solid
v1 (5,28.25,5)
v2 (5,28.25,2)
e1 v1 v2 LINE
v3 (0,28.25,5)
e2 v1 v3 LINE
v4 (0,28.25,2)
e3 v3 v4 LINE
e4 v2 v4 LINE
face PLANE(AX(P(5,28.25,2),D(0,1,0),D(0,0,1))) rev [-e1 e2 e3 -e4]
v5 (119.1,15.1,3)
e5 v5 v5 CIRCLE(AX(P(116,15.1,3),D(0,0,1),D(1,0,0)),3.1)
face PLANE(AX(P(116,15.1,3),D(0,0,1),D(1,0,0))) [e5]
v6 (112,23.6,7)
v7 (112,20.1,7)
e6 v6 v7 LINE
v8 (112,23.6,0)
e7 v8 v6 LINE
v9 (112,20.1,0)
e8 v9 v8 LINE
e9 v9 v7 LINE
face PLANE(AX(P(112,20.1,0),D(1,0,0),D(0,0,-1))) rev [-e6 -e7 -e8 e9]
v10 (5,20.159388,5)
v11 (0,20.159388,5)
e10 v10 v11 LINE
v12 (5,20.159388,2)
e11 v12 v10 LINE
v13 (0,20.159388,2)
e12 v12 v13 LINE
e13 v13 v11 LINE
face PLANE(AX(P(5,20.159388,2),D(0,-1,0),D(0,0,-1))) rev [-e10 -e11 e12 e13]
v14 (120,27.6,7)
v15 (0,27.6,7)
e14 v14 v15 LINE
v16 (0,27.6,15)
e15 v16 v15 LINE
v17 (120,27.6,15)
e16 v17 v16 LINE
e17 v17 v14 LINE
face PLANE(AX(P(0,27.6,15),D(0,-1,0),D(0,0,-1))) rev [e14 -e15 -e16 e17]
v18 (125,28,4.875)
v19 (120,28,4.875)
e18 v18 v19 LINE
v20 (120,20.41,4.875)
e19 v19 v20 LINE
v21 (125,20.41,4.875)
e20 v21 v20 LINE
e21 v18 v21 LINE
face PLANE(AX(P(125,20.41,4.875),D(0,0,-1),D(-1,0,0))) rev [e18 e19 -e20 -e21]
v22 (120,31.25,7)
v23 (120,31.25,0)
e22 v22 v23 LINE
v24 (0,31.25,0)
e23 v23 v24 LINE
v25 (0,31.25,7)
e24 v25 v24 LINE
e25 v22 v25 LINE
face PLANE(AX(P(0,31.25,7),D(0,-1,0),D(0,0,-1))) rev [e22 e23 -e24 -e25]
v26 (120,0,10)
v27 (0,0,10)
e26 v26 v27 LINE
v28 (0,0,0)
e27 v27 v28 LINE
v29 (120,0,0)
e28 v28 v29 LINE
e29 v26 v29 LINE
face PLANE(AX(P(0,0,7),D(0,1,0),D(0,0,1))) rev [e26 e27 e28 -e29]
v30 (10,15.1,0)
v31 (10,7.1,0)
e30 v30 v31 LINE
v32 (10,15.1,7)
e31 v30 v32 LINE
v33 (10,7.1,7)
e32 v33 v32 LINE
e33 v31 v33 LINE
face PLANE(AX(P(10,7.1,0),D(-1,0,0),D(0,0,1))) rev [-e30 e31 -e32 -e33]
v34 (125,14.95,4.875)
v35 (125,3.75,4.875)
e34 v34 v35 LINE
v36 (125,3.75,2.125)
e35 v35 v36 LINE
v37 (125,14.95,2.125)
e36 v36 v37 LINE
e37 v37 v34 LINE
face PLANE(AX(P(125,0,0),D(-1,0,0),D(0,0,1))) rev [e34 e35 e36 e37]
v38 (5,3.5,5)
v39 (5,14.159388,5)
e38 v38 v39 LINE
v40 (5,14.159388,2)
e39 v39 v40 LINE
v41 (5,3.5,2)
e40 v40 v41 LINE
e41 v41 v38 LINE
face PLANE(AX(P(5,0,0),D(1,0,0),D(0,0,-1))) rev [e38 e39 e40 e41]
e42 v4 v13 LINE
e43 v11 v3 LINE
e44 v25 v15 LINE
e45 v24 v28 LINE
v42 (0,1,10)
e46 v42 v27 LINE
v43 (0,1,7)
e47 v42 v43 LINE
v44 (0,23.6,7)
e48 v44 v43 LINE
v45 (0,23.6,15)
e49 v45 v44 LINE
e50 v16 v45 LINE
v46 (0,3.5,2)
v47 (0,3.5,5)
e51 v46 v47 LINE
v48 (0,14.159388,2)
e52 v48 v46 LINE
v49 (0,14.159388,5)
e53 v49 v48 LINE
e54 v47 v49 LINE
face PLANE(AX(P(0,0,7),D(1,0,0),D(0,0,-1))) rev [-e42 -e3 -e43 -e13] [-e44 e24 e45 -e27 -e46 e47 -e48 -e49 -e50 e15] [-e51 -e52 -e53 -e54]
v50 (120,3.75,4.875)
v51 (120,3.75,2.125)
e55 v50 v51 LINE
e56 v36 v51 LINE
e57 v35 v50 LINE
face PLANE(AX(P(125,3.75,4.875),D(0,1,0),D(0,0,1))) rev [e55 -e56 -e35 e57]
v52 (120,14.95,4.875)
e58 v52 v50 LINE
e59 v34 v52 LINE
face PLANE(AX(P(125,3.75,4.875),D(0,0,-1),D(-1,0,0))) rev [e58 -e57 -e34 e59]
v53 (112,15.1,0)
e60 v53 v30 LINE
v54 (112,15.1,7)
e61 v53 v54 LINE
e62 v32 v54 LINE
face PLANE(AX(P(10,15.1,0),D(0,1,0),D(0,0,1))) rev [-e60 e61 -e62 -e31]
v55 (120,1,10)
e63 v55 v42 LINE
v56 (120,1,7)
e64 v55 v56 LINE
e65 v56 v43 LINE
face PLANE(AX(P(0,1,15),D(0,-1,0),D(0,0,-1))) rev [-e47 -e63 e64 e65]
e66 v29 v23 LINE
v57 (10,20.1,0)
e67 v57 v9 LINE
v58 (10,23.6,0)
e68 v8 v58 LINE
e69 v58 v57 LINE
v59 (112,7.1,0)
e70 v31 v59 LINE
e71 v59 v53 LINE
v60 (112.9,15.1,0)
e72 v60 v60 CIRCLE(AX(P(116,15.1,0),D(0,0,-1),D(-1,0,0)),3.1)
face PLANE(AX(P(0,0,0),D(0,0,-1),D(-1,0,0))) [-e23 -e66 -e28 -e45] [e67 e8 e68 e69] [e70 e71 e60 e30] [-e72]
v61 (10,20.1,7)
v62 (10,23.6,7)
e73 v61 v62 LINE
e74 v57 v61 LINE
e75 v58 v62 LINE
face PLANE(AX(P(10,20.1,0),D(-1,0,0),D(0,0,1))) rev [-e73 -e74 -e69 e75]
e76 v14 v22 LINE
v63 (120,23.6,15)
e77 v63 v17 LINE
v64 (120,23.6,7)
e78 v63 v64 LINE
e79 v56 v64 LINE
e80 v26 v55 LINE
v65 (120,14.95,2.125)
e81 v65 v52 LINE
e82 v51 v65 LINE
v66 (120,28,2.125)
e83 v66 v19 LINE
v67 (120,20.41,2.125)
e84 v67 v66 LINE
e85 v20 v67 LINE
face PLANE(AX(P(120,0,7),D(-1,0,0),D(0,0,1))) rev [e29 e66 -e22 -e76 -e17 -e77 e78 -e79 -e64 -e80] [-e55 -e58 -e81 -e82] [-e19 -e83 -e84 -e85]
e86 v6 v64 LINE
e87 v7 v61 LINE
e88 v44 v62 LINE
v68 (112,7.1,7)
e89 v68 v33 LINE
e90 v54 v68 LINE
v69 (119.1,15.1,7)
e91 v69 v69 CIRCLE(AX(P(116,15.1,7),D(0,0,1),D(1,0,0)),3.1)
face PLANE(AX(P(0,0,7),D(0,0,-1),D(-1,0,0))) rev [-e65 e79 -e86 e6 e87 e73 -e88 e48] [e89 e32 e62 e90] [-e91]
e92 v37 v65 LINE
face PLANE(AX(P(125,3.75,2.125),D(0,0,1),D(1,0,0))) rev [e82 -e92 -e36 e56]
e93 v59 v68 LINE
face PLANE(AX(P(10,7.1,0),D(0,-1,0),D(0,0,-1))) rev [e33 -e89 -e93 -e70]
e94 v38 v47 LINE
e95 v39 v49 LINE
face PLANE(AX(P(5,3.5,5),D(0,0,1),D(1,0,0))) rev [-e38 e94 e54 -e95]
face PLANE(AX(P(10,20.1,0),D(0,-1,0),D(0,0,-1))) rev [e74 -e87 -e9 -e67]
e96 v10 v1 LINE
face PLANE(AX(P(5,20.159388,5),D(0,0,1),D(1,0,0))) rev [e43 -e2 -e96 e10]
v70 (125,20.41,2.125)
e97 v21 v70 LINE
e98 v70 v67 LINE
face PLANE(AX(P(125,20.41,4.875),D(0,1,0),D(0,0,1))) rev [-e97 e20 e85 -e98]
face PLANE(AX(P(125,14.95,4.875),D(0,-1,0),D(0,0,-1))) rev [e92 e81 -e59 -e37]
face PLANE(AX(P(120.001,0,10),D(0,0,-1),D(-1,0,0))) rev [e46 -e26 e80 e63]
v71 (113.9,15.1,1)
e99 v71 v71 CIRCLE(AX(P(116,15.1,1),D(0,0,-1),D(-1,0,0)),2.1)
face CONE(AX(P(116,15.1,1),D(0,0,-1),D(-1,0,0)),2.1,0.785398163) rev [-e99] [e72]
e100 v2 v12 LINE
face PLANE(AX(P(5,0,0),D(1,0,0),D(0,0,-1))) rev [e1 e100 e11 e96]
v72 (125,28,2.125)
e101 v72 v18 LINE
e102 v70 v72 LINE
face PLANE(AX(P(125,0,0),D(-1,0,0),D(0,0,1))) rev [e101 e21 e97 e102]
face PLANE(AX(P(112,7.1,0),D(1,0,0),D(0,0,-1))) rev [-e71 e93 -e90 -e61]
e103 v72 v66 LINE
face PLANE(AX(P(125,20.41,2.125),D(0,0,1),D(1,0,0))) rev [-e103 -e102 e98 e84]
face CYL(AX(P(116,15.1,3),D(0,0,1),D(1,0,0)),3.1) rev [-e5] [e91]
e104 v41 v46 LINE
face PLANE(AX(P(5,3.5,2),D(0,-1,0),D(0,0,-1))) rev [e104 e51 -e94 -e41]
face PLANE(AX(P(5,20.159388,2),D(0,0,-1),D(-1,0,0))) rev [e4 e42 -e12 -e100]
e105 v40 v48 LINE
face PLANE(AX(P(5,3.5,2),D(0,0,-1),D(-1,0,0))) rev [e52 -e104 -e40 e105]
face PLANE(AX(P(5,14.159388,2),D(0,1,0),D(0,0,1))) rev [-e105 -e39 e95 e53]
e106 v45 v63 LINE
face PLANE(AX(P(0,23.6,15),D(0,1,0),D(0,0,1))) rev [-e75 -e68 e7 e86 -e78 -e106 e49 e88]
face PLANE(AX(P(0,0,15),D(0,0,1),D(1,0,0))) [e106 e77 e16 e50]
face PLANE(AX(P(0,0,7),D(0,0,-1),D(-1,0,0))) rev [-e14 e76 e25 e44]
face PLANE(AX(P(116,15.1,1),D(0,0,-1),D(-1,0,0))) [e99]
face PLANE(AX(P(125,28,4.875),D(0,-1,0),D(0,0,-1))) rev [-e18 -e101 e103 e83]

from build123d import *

# Parameters (mm, degrees)
SKETCH1_W               = 120
SKETCH1_H               = 31.25
BOSS_EXTRUDE1_DEPTH     = 7
SKETCH2_W               = 120
SKETCH2_H               = 4
SKETCH2_H_2             = 1
BOSS_EXTRUDE2_DEPTH     = 8
CUT_EXTRUDE1_DEPTH      = 125.260059955
CUT_EXTRUDE1_DEPTH_BACK = 125.260059955
SKETCH3_W               = 102
SKETCH3_H               = 8
SKETCH3_H_2             = 3.5
CUT_EXTRUDE3_REACH      = 126.906
SKETCH6_W               = 5
SKETCH6_H               = 1
SKETCH4_W               = 3
SKETCH4_H               = 8.090611825
SKETCH4_H_2             = 10.659388175
CUT_EXTRUDE4_DEPTH      = 5
SKETCH5_W               = 2.75
SKETCH5_H               = 7.59
SKETCH5_H_2             = 11.2
BOSS_EXTRUDE3_DEPTH     = 5
SKETCH7_R               = 3.1
CUT_EXTRUDE5_DEPTH      = 4
CUT_EXTRUDE6_START      = -1
SKETCH8_R               = 3.1
CUT_EXTRUDE6_DEPTH      = 1
CHAMFER1_SIZE           = 1


with BuildPart() as part:
    # Sketch1 → Boss-Extrude1 (new body)
    with BuildSketch(Plane.XY):
        with Locations((60, 15.625)):
            Rectangle(SKETCH1_W, SKETCH1_H)
    extrude(amount=BOSS_EXTRUDE1_DEPTH)

    # Sketch2 → Boss-Extrude2 (add)
    with BuildSketch(Plane.XY.offset(7)):
        with Locations((60, 25.6)):
            Rectangle(SKETCH2_W, SKETCH2_H)
        with Locations((60, 0.5)):
            Rectangle(SKETCH2_W, SKETCH2_H_2)
    extrude(amount=BOSS_EXTRUDE2_DEPTH)

    # Sketch3 → Cut-Extrude1 (cut, two sides: drawn at the far end of the back side and taken through both)
    with BuildSketch(Plane.XY.offset(7).offset(-CUT_EXTRUDE1_DEPTH_BACK)):
        with Locations((61, 11.1)):
            Rectangle(SKETCH3_W, SKETCH3_H)
        with Locations((61, 21.85)):
            Rectangle(SKETCH3_W, SKETCH3_H_2)
    extrude(amount=CUT_EXTRUDE1_DEPTH + CUT_EXTRUDE1_DEPTH_BACK, mode=Mode.SUBTRACT)

    # Sketch6 → Cut-Extrude3 (cut, up to next)
    with BuildSketch(Plane.ZY, mode=Mode.PRIVATE) as cut_extrude3_sk1:
        with Locations((12.5, 0.5)):
            Rectangle(SKETCH6_W, SKETCH6_H)
    cut_extrude3_tool1 = extrude(cut_extrude3_sk1.sketch, amount=-CUT_EXTRUDE3_REACH, mode=Mode.PRIVATE) & part.part
    add(cut_extrude3_tool1.solids().sort_by_distance((0, 0.5, 12.5))[0], mode=Mode.SUBTRACT)

    # Sketch4 → Cut-Extrude4 (cut)
    with BuildSketch(Plane.ZY):
        with Locations((3.5, 24.204694088)):
            Rectangle(SKETCH4_W, SKETCH4_H)
        with Locations((3.5, 8.829694088)):
            Rectangle(SKETCH4_W, SKETCH4_H_2)
    extrude(amount=-CUT_EXTRUDE4_DEPTH, mode=Mode.SUBTRACT)

    # Sketch5 → Boss-Extrude3 (add)
    with BuildSketch(Plane(origin=(120, 0, 0), x_dir=(0, 0, -1), z_dir=(1, 0, 0))):
        with Locations((-3.5, 24.205)):
            Rectangle(SKETCH5_W, SKETCH5_H)
        with Locations((-3.5, 9.35)):
            Rectangle(SKETCH5_W, SKETCH5_H_2)
    extrude(amount=BOSS_EXTRUDE3_DEPTH)

    # Sketch7 → Cut-Extrude5 (cut)
    with BuildSketch(Plane.XY.offset(7)):
        with Locations((116, 15.1)):
            Circle(SKETCH7_R)
    extrude(amount=-CUT_EXTRUDE5_DEPTH, mode=Mode.SUBTRACT)

    # Sketch8 → Cut-Extrude6 (cut)
    with BuildSketch(Plane(origin=(0, 0, 0), x_dir=(-1, 0, 0), z_dir=(0, 0, -1)).offset(CUT_EXTRUDE6_START)):
        with Locations(Location((-116, 15.1, 0), (0, 0, 180))):
            Circle(SKETCH8_R)
    extrude(amount=CUT_EXTRUDE6_DEPTH, mode=Mode.SUBTRACT)

    # Chamfer1
    chamfer1_edges = [part.edges().sort_by_distance(p)[0] for p in [
        (112.9, 15.1, 1),
    ]]
    chamfer(chamfer1_edges, length=CHAMFER1_SIZE - 0.0001)  # a hair under: the kernel refuses the full size


solid = part.part
